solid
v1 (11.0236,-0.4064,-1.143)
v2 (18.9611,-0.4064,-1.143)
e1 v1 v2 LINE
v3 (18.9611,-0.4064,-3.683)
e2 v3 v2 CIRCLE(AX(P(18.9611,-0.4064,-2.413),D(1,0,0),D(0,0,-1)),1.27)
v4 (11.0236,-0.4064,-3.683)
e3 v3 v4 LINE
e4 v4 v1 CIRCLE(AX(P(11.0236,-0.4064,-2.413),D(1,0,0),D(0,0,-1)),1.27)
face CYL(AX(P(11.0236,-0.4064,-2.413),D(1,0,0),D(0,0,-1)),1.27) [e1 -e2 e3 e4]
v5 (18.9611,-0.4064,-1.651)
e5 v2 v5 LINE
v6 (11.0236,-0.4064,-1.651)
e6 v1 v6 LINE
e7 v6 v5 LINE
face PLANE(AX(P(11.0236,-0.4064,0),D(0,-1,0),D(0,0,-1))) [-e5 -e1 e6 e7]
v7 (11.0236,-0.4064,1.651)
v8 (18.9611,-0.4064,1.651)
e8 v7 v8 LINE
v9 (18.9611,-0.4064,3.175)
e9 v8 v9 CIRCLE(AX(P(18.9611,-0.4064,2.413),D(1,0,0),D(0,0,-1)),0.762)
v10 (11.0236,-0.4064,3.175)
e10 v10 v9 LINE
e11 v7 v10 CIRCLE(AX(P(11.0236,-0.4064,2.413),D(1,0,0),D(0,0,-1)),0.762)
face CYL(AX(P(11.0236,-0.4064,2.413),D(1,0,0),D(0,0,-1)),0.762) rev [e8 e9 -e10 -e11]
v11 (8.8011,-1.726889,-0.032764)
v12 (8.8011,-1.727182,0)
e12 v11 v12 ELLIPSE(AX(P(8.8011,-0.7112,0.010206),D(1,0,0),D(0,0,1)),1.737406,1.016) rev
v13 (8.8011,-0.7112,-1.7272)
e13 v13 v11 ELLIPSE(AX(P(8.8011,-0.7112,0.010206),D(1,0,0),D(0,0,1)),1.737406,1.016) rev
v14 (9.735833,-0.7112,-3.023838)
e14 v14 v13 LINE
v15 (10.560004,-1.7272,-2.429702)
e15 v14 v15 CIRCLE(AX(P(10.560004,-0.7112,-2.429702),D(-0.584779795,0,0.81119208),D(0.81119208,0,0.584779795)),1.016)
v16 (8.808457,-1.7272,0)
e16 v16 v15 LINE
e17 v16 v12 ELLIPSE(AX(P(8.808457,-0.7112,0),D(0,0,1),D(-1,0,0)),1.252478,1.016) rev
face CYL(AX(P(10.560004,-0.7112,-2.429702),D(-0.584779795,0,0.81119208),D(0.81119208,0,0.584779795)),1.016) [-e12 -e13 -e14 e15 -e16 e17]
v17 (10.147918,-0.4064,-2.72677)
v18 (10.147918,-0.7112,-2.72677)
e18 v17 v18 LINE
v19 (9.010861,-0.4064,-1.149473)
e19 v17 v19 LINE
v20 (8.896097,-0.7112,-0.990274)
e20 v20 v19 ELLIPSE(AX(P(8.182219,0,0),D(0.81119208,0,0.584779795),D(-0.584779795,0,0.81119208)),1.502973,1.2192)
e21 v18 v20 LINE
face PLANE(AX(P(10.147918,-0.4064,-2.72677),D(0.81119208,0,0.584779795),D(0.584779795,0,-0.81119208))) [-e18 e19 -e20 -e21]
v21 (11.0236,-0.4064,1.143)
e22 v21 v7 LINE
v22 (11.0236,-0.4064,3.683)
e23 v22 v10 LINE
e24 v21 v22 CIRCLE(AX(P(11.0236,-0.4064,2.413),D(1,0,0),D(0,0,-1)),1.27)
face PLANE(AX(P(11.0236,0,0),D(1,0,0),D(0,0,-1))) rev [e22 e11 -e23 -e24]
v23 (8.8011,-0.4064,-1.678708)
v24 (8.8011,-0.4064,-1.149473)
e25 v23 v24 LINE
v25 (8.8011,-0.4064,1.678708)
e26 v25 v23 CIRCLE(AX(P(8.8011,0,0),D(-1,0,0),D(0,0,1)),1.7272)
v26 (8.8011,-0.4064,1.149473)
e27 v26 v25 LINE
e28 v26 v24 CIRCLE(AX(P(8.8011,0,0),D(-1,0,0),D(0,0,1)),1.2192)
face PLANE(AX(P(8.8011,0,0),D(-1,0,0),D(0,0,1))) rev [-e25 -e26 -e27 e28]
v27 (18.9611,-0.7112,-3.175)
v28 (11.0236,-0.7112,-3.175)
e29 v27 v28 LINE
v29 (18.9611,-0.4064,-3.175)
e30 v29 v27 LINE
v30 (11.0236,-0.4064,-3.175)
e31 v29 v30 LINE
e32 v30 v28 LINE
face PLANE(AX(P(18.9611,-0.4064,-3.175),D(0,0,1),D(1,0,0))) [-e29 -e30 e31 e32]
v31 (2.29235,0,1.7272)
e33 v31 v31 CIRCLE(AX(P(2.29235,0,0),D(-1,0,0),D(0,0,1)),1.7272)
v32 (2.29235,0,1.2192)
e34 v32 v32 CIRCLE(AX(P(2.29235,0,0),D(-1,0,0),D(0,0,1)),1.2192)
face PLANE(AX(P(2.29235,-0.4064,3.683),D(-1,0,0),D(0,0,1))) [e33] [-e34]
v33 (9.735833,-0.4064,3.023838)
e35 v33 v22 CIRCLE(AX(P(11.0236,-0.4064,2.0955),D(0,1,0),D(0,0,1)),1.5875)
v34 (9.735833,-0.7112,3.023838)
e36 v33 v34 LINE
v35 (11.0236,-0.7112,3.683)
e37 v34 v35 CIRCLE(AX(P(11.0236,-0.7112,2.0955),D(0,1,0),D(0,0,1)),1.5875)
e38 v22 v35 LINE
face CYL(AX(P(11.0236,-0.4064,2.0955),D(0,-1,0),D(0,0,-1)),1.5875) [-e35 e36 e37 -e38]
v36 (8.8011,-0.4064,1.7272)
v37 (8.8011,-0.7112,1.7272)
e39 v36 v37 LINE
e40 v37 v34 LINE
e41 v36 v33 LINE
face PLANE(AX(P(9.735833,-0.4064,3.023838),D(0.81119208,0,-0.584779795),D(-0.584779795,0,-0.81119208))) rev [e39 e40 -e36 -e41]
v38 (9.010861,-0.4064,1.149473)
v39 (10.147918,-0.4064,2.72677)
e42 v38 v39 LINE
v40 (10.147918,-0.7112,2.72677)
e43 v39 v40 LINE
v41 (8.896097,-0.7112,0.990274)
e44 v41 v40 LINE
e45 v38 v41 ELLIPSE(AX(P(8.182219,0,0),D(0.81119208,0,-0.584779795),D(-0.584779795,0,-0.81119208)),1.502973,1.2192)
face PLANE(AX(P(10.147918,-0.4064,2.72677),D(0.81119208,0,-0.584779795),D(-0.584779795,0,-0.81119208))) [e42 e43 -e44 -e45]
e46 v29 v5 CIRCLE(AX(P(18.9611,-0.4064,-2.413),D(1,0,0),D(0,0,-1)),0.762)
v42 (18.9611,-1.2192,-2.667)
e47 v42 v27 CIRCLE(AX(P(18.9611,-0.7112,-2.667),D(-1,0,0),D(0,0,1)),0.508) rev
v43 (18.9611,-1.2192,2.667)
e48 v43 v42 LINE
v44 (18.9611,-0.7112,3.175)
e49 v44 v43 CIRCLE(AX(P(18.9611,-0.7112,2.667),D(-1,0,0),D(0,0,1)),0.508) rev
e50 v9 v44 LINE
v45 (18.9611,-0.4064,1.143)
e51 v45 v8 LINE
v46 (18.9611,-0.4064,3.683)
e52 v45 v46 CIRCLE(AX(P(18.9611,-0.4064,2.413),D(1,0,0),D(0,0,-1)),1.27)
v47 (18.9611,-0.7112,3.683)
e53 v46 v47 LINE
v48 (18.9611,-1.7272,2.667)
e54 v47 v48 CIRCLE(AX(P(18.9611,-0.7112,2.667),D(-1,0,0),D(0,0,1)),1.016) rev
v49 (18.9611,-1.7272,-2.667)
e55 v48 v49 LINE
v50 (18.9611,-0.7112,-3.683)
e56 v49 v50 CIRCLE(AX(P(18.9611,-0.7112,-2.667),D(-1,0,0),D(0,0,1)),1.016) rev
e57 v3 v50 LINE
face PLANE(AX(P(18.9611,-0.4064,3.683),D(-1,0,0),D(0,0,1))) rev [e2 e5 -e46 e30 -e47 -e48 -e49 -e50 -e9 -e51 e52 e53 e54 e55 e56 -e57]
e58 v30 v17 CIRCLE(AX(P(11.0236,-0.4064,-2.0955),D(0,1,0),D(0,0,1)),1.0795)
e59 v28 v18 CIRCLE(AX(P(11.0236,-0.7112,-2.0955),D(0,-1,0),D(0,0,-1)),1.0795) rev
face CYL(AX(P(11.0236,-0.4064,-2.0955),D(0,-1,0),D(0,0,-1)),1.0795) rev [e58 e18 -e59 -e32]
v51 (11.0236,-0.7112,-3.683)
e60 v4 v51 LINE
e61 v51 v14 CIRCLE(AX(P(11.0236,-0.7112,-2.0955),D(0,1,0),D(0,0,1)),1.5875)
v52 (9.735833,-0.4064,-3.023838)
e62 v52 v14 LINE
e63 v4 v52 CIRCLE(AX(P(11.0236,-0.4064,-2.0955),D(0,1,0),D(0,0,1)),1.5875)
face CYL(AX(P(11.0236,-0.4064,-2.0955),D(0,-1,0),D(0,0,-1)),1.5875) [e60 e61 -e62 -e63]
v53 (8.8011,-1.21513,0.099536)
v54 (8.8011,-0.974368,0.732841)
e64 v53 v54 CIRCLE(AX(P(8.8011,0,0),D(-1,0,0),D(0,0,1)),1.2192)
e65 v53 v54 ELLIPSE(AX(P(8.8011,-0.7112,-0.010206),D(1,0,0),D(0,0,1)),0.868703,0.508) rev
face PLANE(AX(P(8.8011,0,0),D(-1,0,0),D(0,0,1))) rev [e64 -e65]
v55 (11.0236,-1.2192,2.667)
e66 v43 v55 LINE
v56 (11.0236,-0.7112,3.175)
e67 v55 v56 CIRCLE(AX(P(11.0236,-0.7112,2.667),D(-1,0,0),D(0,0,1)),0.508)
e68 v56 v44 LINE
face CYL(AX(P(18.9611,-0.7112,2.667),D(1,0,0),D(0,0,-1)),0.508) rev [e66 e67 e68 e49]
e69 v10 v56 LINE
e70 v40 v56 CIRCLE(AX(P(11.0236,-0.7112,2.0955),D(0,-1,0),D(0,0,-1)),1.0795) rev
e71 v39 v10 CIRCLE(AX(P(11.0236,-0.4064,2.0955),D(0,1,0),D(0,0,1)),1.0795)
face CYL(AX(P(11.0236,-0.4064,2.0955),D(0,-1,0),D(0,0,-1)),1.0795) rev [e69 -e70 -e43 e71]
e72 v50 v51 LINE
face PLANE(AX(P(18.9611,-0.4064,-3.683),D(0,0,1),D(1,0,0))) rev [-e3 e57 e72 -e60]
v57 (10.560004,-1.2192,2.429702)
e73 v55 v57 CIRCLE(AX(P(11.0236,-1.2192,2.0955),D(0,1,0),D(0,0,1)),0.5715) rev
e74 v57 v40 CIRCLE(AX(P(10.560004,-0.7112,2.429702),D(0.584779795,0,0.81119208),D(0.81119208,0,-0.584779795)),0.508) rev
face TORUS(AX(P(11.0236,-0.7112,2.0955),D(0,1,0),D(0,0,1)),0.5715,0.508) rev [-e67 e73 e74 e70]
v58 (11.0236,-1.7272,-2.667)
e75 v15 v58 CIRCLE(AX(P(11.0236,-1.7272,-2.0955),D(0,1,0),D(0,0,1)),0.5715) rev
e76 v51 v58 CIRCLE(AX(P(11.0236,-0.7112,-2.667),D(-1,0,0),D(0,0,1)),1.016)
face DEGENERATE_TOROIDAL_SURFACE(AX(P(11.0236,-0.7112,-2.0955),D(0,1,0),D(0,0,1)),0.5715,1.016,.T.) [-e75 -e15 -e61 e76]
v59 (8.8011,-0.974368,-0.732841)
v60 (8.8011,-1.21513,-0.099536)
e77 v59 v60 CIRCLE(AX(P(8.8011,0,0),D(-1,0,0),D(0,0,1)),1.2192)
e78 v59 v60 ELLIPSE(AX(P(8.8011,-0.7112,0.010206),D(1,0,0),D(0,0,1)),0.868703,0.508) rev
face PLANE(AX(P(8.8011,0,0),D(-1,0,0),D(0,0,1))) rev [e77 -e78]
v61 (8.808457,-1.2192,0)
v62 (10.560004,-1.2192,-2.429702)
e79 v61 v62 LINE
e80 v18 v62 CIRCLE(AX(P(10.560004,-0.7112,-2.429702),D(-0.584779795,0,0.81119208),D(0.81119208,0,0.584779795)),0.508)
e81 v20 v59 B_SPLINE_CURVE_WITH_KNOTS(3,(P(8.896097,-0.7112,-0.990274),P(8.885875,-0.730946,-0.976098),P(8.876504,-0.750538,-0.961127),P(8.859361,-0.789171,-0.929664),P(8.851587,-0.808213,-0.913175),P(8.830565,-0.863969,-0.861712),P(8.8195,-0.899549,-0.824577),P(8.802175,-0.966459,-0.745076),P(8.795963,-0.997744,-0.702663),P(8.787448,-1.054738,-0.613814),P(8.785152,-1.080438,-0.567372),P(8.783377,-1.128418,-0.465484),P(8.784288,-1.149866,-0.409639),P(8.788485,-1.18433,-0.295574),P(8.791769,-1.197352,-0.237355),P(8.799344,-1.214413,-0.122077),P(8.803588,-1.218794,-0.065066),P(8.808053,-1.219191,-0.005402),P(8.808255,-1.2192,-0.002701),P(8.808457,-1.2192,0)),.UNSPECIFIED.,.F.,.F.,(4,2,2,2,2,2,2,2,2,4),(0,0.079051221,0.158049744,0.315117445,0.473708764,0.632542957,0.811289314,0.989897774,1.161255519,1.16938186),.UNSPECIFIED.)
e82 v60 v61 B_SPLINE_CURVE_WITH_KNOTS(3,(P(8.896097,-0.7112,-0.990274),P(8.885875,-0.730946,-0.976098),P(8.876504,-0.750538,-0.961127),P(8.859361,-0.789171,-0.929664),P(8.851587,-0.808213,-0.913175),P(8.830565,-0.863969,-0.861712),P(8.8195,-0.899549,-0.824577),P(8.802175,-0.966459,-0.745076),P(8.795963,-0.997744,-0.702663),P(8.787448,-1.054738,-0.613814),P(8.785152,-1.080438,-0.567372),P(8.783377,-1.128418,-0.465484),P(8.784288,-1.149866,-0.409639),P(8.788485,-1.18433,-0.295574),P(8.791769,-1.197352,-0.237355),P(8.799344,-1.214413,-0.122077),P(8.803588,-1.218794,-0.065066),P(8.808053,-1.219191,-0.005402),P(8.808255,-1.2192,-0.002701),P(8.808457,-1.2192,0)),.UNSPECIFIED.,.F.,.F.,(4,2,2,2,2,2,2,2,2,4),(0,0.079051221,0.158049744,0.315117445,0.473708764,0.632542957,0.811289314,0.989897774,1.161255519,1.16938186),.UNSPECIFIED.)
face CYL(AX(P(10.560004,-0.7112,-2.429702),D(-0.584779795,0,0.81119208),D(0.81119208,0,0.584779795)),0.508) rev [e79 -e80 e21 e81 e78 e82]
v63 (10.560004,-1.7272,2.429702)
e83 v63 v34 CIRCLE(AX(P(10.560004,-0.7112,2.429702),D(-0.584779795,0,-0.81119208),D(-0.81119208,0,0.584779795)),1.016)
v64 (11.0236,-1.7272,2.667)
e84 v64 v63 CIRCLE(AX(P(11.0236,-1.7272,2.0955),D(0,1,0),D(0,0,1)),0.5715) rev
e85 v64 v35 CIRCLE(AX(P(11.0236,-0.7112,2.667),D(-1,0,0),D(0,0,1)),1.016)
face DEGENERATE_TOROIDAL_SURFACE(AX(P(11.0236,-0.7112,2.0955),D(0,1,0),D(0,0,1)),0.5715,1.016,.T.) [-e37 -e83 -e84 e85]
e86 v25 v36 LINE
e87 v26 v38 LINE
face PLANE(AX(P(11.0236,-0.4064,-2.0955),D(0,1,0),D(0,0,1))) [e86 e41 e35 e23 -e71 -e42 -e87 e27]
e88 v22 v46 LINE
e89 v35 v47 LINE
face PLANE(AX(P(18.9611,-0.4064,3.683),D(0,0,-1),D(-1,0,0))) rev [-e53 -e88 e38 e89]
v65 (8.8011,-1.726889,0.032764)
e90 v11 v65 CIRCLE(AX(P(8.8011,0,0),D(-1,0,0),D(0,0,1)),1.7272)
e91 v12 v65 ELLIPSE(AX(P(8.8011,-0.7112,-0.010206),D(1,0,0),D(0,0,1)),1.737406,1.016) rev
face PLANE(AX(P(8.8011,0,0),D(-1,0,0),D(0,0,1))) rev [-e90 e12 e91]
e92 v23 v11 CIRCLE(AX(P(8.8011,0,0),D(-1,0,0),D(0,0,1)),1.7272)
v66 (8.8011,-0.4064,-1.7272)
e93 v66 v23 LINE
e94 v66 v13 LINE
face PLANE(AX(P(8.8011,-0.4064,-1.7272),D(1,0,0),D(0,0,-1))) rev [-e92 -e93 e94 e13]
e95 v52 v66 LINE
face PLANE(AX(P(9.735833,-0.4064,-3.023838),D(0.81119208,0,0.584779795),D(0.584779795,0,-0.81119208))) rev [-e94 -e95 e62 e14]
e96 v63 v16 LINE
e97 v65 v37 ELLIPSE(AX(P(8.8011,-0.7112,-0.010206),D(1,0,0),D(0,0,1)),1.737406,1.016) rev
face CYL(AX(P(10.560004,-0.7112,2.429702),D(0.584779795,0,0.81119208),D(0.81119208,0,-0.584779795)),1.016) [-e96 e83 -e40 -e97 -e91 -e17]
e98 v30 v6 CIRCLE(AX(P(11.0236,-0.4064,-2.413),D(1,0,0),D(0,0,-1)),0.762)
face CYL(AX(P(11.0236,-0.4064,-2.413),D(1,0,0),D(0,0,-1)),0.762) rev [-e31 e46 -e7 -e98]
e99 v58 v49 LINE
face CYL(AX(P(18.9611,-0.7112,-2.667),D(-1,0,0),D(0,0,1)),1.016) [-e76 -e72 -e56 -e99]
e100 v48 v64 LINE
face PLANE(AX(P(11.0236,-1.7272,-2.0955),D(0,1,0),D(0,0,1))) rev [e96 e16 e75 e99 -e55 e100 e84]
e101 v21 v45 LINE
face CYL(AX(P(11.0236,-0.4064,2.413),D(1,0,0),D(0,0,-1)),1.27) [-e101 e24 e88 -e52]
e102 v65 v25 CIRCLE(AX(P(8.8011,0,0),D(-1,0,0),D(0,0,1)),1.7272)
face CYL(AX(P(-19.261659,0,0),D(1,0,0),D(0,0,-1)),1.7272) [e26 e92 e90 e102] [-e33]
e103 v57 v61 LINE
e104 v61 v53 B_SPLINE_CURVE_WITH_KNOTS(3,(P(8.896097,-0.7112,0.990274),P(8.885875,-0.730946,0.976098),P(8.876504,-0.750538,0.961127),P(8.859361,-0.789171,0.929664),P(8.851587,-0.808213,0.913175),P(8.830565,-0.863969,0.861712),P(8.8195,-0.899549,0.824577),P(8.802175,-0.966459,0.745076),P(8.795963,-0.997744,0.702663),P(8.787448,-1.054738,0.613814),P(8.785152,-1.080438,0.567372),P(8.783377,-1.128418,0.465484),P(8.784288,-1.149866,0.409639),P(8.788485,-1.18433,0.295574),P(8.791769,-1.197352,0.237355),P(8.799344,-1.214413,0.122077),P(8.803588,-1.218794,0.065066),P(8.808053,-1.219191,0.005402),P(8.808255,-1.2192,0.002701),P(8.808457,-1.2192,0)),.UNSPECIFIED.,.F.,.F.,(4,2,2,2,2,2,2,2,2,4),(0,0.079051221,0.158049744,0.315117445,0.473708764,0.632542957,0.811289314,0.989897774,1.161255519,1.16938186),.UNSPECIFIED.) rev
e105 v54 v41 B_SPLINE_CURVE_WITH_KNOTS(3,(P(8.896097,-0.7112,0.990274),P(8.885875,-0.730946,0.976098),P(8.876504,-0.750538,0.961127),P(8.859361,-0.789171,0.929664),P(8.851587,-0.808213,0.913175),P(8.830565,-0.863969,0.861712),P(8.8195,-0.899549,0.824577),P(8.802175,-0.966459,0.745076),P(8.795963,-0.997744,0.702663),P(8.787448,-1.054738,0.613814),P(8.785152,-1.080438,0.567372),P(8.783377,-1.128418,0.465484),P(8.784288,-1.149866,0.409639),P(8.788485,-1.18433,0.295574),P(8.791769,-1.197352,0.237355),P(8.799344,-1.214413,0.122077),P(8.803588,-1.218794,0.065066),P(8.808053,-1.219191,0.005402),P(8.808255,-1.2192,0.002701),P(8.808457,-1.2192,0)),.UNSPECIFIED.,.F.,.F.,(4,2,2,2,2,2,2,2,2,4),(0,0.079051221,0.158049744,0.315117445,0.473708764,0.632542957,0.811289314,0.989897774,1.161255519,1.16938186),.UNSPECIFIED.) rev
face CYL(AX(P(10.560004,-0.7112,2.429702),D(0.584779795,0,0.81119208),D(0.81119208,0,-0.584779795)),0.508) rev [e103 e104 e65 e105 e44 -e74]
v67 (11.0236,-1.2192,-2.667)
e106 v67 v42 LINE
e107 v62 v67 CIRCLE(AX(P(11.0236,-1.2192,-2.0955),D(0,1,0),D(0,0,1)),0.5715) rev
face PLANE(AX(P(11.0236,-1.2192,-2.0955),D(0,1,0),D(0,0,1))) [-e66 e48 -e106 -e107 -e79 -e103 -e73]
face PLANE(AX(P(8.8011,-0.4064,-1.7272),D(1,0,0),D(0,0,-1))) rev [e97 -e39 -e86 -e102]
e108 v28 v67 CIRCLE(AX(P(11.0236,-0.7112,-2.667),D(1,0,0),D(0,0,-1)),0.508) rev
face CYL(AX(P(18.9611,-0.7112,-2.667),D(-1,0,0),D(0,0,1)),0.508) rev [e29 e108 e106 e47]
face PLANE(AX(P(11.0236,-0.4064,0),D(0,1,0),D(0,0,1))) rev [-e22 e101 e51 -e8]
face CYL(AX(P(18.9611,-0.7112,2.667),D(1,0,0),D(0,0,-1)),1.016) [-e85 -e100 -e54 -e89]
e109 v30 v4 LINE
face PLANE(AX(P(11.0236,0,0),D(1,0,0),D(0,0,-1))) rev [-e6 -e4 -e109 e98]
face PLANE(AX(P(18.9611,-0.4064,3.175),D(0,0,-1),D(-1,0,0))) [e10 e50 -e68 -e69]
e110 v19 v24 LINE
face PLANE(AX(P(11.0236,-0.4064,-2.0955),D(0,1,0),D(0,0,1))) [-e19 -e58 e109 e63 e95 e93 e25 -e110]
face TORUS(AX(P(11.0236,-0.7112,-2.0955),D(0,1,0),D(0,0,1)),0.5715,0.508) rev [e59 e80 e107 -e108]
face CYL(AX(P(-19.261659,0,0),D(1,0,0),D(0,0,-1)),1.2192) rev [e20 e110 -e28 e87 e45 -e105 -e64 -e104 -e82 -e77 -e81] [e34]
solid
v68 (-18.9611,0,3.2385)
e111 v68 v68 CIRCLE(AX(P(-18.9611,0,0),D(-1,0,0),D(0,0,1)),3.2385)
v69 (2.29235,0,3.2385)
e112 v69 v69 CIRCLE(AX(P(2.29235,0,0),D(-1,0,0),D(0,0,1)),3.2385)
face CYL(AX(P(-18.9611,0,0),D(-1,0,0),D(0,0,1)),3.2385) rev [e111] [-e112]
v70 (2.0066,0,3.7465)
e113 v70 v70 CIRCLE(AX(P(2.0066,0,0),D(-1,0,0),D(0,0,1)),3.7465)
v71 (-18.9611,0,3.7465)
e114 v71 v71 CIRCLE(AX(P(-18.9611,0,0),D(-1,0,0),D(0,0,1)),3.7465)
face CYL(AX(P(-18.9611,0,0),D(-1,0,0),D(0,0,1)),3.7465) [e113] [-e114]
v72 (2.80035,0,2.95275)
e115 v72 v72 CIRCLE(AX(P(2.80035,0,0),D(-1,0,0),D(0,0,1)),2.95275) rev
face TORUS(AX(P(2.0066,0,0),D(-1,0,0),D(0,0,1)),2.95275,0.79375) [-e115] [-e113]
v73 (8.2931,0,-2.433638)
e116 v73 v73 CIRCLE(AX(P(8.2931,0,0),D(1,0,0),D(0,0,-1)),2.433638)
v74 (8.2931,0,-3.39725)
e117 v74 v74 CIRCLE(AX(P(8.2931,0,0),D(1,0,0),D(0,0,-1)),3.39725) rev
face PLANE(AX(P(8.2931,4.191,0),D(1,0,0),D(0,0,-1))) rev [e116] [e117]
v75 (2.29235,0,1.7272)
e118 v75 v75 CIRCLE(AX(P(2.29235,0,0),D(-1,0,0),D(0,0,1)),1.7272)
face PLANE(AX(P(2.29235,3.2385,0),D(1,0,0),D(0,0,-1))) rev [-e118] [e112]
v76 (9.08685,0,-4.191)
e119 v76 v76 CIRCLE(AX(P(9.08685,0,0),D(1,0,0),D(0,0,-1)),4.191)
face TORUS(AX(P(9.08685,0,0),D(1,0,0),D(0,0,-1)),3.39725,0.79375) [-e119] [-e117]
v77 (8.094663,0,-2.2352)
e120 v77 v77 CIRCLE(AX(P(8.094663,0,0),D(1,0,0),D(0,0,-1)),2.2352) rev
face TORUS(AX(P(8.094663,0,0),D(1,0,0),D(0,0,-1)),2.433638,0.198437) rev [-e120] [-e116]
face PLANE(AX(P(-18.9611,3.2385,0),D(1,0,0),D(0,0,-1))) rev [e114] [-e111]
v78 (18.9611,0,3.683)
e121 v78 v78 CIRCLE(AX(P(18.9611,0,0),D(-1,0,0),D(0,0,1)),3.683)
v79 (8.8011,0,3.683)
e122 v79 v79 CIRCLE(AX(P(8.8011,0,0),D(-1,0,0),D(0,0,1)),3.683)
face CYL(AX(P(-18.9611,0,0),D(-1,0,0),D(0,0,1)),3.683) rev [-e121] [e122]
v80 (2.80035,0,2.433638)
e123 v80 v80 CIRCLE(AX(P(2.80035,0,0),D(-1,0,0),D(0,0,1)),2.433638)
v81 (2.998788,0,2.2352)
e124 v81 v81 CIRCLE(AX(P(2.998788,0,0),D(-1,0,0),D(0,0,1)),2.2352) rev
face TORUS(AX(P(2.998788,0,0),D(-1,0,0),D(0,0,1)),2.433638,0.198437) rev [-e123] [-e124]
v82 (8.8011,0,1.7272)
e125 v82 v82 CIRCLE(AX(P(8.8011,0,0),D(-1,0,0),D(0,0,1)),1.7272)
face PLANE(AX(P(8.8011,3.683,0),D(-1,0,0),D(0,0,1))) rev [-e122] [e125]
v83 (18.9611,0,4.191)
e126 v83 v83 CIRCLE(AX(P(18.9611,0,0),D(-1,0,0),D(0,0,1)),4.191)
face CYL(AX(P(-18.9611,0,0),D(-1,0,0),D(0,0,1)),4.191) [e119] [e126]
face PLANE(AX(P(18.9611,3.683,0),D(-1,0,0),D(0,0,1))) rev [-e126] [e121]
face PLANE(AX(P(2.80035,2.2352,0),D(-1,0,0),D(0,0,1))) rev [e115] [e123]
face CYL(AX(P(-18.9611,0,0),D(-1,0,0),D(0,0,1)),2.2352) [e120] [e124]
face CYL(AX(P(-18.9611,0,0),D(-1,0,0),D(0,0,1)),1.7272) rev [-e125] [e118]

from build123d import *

# Parameters (mm, degrees)
BOSS_EXTRUDE1_START = -1.7272
BOSS_EXTRUDE1_DEPTH = 1.3208
FILLET1_R           = 1.016
SHELL1_T            = -0.508
SKETCH4_R           = 1.7272
SKETCH4_R_2         = 1.2192
BOSS_EXTRUDE2_DEPTH = 6.50875
SKETCH5_R           = 1.2192
CUT_EXTRUDE1_DEPTH  = 18.157940885
BOSS_EXTRUDE3_DEPTH = 7.9375
FILLET2_R           = 0.79375
FILLET3_R           = 0.1984375


with BuildPart() as part:
    # Sketch3 → Boss-Extrude1 (new body)
    with BuildSketch(Plane(origin=(0, 0, 0), x_dir=(1, 0, 0), z_dir=(0, 1, 0)).offset(BOSS_EXTRUDE1_START)):
        with BuildLine():
            Line((18.9611, -3.683), (18.9611, 3.683))
            Line((18.9611, 3.683), (11.0236, 3.683))
            ThreePointArc((11.0236, 3.683), (10.300267506, 3.508633523), (9.735832572, 3.023837925))
            Line((9.735832572, 3.023837925), (8.8011, 1.7272))
            Line((8.8011, 1.7272), (8.8011, -1.7272))
            Line((8.8011, -1.7272), (9.735832572, -3.023837925))
            ThreePointArc((9.735832572, -3.023837925), (10.300267506, -3.508633523), (11.0236, -3.683))
            Line((11.0236, -3.683), (18.9611, -3.683))
        make_face()
    extrude(amount=BOSS_EXTRUDE1_DEPTH)

    # Fillet1
    # the kernel refuses this fillet: 1.016 mm, written as the material it takes off along each edge
    with BuildSketch(Plane(origin=(11.0236, -1.7272, 3.683), x_dir=(0, 1, 0), z_dir=(1, 0, 0)), Plane(origin=(21.5011, -1.7272, -3.683), x_dir=(0, 1, 0), z_dir=(-1, 0, 0))) as fillet1_piece_1:
        with BuildLine():
            CenterArc((FILLET1_R, -FILLET1_R), FILLET1_R, 90, 90)
            Line((0, -FILLET1_R), (0, 0))
            Line((0, 0), (FILLET1_R, 0))
        make_face()
    extrude(amount=10.4775, mode=Mode.SUBTRACT)
    with BuildSketch(Plane(origin=(7.31575932, -1.7272, -0.333227884), x_dir=(0, 1, 0), z_dir=(0.5847797951356621, 0, 0.8111920803367678)), Plane(origin=(9.735832572, -1.7272, -3.023837925), x_dir=(0, 1, 0), z_dir=(-0.5847797951356621, 0, 0.8111920803367678))) as fillet1_piece_2:
        with BuildLine():
            CenterArc((FILLET1_R, -FILLET1_R), FILLET1_R, 90, 90)
            Line((0, -FILLET1_R), (0, 0))
            Line((0, 0), (FILLET1_R, 0))
        make_face()
    extrude(amount=4.138435138, mode=Mode.SUBTRACT)
    with BuildSketch(Plane(origin=(11.0236, -1.7272, 2.0955), x_dir=(-0.8111920803367688, 0, 0.5847797951356606), z_dir=(-0.5847797951356606, 0, -0.8111920803367688))) as fillet1_piece_3:
        with BuildLine():
            CenterArc((1.5875 - FILLET1_R, FILLET1_R), FILLET1_R, 270, 90)
            Line((1.5875 - FILLET1_R, 0), (1.5875, 0))
            Line((1.5875, 0), (1.5875, FILLET1_R))
        make_face()
    revolve(axis=Axis((11.0236, -1.7272, 2.0955), (0, 1, 0)), revolution_arc=54.212564929, mode=Mode.SUBTRACT)
    with BuildSketch(Plane(origin=(11.0236, -1.7272, -2.0955), x_dir=(0, 0, -1), z_dir=(1, 0, 0))) as fillet1_piece_4:
        with BuildLine():
            CenterArc((1.5875 - FILLET1_R, FILLET1_R), FILLET1_R, 270, 90)
            Line((1.5875 - FILLET1_R, 0), (1.5875, 0))
            Line((1.5875, 0), (1.5875, FILLET1_R))
        make_face()
    revolve(axis=Axis((11.0236, -1.7272, -2.0955), (0, 1, 0)), revolution_arc=54.212564929, mode=Mode.SUBTRACT)

    # Shell1
    shell1_openings = [part.faces().sort_by_distance(p)[0] for p in [
        (14.067725461, -0.4064, 0),
        (18.9611, -1.046119025, 0),
        (8.8011, -0.98049065, 0),
    ]]
    offset(amount=SHELL1_T, openings=shell1_openings, kind=Kind.INTERSECTION)

    # Sketch4 → Boss-Extrude2 (add)
    with BuildSketch(Plane.ZY.offset(-8.8011)):
        with Locations(Location((0, 0, 0), (0, 0, 193.608960631))):
            Circle(SKETCH4_R)
        with Locations(Location((0, 0, 0), (0, 0, 199.471220634))):
            Circle(SKETCH4_R_2, mode=Mode.SUBTRACT)
    extrude(amount=BOSS_EXTRUDE2_DEPTH)

    # Sketch5 → Cut-Extrude1 (cut, through all)
    with BuildSketch(Plane.ZY.offset(-2.29235)):
        with Locations(Location((0, 0, 0), (0, 0, 199.471220634))):
            Circle(SKETCH5_R)
    extrude(amount=-CUT_EXTRUDE1_DEPTH, mode=Mode.SUBTRACT)

    # Sketch6 → Boss-Extrude3 (add)
    with BuildSketch(Plane(origin=(18.9611, 0, 0), x_dir=(0, 0, -1), z_dir=(1, 0, 0))):
        with BuildLine():
            Line((3.683, -0.7112), (3.683, -0.4064))
            Line((3.683, -0.4064), (3.175, -0.4064))
            Line((3.175, -0.4064), (3.175, -0.7112))
            ThreePointArc((3.175, -0.7112), (3.026210245, -1.070410245), (2.667, -1.2192))
            Line((2.667, -1.2192), (-2.667, -1.2192))
            ThreePointArc((-2.667, -1.2192), (-3.026210245, -1.070410245), (-3.175, -0.7112))
            Line((-3.175, -0.7112), (-3.175, -0.4064))
            Line((-3.175, -0.4064), (-3.683, -0.4064))
            Line((-3.683, -0.4064), (-3.683, -0.7112))
            ThreePointArc((-3.683, -0.7112), (-3.38542049, -1.42962049), (-2.667, -1.7272))
            Line((-2.667, -1.7272), (2.667, -1.7272))
            ThreePointArc((2.667, -1.7272), (3.38542049, -1.42962049), (3.683, -0.7112))
        make_face()
        with BuildLine():
            Line((3.175, -0.4064), (3.683, -0.4064))
            ThreePointArc((3.683, -0.4064), (2.413, 0.8636), (1.143, -0.4064))
            Line((1.143, -0.4064), (1.651, -0.4064))
            ThreePointArc((1.651, -0.4064), (2.413, 0.3556), (3.175, -0.4064))
        make_face()
        with BuildLine():
            ThreePointArc((-1.143, -0.4064), (-2.413, 0.8636), (-3.683, -0.4064))
            Line((-3.683, -0.4064), (-3.175, -0.4064))
            ThreePointArc((-3.175, -0.4064), (-2.413, 0.3556), (-1.651, -0.4064))
            Line((-1.651, -0.4064), (-1.143, -0.4064))
        make_face()
    extrude(amount=-BOSS_EXTRUDE3_DEPTH)


with BuildPart() as body_2:
    # Sketch9 → Revolve1 (revolve)
    with BuildSketch(Plane.XY, mode=Mode.PRIVATE) as revolve1_sk:
        Polygon((-18.9611, 3.2385), (2.29235, 3.2385), (2.29235, 1.7272), (8.8011, 1.7272), (8.8011, 3.683), (18.9611, 3.683), (18.9611, 4.191), (8.2931, 4.191), (8.2931, 2.2352), (2.80035, 2.2352), (2.80035, 3.7465), (-18.9611, 3.7465), align=None)
    revolve(revolve1_sk.sketch.rotate(Axis((-18.9611, 0, 0), (1, 0, 0)), 90), axis=Axis((-18.9611, 0, 0), (1, 0, 0)))

    # Fillet2
    fillet2_edges = [body_2.edges().sort_by_distance(p)[0] for p in [
        (8.2931, 0, -4.191),
        (2.80035, 0, -3.7465),
    ]]
    fillet(fillet2_edges, radius=FILLET2_R)

    # Fillet3
    fillet3_edges = [body_2.edges().sort_by_distance(p)[0] for p in [
        (8.2931, 0, -2.2352),
        (2.80035, 0, -2.2352),
    ]]
    fillet(fillet3_edges, radius=FILLET3_R)


solid = Compound([part.part, body_2.part])
